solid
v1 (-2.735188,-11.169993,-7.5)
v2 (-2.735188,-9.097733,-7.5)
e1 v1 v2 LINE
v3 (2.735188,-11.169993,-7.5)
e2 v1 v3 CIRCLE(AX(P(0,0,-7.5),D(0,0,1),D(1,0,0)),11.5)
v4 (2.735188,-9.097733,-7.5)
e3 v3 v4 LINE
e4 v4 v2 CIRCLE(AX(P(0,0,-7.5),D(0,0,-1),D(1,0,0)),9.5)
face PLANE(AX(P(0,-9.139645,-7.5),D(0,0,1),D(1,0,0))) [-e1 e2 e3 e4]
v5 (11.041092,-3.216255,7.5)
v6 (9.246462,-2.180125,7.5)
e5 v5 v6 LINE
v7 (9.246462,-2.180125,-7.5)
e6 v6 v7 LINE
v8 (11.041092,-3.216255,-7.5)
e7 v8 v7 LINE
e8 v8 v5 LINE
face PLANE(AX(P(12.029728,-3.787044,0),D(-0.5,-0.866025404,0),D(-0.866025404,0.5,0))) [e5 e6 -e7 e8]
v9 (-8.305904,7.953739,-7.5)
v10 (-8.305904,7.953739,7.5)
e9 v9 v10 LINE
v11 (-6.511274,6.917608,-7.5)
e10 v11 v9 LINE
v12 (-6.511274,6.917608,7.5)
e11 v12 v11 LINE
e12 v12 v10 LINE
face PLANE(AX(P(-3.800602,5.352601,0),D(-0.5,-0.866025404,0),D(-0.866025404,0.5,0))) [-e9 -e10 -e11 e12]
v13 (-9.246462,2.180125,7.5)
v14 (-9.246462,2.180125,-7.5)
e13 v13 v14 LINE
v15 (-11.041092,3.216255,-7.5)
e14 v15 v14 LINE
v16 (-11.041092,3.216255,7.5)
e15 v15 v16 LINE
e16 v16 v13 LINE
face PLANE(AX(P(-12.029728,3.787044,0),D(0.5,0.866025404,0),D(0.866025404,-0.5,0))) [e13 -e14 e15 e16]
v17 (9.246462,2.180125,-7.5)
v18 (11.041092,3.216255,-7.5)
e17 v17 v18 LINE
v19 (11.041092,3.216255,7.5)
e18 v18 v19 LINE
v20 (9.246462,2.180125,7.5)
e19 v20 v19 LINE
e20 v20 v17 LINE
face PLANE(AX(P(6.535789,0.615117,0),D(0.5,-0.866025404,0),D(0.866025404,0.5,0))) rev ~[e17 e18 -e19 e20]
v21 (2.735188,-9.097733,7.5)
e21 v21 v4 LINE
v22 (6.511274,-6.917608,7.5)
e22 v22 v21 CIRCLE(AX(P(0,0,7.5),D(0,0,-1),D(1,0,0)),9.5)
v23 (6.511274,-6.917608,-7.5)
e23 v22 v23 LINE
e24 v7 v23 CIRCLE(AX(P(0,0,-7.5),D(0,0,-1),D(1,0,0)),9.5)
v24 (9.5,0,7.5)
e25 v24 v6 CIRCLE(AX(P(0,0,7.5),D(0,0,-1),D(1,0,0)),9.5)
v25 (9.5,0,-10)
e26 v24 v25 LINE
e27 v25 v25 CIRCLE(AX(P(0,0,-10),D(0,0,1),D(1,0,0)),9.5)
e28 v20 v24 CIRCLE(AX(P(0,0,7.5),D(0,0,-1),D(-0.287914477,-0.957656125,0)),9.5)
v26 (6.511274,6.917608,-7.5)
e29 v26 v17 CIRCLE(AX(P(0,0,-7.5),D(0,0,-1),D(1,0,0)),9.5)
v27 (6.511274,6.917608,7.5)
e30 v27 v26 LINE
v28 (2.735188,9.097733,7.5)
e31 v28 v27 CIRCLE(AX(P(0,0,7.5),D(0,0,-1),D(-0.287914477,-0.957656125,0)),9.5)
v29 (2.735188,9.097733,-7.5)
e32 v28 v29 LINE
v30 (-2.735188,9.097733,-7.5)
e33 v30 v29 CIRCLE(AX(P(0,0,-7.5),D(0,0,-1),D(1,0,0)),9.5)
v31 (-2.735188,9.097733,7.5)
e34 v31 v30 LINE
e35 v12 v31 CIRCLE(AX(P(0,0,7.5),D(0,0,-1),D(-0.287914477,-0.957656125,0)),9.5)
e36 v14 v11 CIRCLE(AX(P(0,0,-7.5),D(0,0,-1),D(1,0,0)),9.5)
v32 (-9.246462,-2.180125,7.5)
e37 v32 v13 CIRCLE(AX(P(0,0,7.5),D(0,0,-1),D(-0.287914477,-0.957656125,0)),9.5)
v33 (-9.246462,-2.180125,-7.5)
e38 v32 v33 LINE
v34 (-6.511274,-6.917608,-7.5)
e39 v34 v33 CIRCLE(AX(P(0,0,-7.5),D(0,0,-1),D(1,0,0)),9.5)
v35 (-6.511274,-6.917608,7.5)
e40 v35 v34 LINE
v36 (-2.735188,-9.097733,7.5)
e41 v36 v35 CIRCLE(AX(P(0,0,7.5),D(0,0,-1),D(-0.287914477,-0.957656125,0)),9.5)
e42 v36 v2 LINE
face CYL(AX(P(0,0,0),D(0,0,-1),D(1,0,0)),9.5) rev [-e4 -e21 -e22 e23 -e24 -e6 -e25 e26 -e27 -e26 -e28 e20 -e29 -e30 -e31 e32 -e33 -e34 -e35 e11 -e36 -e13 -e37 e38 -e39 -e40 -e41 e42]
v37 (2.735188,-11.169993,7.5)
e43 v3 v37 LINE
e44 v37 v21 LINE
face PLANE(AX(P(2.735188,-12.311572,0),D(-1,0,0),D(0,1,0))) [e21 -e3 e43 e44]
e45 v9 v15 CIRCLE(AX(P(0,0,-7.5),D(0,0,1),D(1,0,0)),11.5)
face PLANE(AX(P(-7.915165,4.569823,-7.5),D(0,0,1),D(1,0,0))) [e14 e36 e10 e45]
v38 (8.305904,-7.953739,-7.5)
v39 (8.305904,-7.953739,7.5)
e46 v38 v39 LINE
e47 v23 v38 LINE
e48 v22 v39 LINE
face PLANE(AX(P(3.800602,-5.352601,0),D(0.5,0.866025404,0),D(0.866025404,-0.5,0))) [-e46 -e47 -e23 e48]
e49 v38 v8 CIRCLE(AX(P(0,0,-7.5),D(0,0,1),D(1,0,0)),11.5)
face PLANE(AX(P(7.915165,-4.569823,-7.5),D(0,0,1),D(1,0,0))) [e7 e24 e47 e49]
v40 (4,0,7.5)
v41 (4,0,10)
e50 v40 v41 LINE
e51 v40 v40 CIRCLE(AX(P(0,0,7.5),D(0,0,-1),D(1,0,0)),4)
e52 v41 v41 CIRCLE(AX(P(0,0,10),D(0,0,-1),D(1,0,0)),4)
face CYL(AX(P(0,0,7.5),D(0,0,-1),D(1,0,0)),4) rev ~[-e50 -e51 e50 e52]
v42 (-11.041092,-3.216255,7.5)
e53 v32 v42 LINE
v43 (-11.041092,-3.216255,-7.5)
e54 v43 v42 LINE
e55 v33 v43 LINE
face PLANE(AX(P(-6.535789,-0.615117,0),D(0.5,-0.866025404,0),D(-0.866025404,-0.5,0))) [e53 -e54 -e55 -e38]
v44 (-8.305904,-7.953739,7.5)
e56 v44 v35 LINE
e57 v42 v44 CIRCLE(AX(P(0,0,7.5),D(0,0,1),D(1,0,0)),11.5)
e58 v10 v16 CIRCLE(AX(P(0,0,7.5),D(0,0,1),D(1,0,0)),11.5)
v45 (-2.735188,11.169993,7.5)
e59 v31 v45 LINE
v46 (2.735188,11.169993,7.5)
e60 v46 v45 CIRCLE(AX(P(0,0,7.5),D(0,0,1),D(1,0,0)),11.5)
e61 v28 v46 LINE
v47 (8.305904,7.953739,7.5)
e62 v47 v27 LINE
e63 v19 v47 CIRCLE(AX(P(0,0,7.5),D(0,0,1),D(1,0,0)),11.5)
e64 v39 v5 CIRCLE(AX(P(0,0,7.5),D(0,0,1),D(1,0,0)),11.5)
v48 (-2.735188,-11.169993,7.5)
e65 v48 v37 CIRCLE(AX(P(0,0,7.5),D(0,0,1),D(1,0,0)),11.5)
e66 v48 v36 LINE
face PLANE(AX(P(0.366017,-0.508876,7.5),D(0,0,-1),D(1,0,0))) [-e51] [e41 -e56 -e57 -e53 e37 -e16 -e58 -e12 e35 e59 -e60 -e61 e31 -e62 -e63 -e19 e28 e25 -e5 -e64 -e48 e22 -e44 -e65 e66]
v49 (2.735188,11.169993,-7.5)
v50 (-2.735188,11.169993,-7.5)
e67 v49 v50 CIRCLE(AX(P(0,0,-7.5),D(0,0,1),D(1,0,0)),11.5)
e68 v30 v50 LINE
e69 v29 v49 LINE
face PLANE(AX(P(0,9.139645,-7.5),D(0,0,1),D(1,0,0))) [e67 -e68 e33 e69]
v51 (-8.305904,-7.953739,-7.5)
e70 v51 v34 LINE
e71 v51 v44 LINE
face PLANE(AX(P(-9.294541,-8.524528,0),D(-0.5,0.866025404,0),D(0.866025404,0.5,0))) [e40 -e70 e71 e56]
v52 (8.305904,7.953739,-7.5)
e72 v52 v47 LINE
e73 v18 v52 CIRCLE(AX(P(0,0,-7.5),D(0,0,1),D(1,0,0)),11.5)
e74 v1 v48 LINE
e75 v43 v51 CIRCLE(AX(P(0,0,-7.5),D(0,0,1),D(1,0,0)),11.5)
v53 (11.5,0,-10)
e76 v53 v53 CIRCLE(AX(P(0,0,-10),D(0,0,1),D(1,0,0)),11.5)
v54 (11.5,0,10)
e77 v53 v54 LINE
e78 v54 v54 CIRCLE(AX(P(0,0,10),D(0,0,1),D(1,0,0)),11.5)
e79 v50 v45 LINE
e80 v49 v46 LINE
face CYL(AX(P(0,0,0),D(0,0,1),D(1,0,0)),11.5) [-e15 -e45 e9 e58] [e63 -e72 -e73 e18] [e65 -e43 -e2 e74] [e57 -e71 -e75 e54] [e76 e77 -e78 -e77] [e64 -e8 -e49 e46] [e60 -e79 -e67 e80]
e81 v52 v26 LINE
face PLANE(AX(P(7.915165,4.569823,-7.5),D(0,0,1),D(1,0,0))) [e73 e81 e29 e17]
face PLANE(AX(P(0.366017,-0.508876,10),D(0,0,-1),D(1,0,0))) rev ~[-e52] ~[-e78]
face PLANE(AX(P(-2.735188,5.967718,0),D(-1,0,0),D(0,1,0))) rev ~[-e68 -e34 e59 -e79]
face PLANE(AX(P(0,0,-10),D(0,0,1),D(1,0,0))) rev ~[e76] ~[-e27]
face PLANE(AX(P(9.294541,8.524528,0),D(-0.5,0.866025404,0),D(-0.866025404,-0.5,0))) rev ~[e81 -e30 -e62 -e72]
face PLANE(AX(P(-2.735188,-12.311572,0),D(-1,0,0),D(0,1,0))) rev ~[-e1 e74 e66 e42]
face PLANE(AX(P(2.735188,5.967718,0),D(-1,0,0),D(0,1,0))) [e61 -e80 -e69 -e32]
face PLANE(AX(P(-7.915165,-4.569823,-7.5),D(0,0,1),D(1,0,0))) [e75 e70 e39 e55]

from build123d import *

# Parameters (mm, degrees)
F0_R     = 11.5
F0_R_2   = 9.5
F1_DEPTH = 10
F2_W     = 5.4703750648
F2_H     = 6.3438538521
F3_DEPTH = 7.5
F4_R     = 4
F5_DEPTH = 2.5


with BuildPart() as f1:
    # F0 (on Top) → F1 (new body, symmetric)
    with BuildSketch(Plane.XY):
        Circle(F0_R)
        Circle(F0_R_2, mode=Mode.SUBTRACT)
    extrude(amount=F1_DEPTH, both=True)

    # F2 (on Top) → F3 (cut, symmetric)
    with BuildSketch(Plane.XY):
        with Locations((0, 9.139645283)):
            Rectangle(F2_W, F2_H)
        Polygon((-3.8006019335, 5.3526010656), (-9.2945405273, 8.5245279917), (-12.0297280597, 3.7870442173), (-6.5357894659, 0.6151172913), align=None)
        Polygon((-6.5357894659, -0.6151172913), (-12.0297280597, -3.7870442173), (-9.2945405273, -8.5245279917), (-3.8006019335, -5.3526010656), align=None)
        with Locations((0, -9.139645283)):
            Rectangle(F2_W, F2_H)
        Polygon((3.8006019335, -5.3526010656), (9.2945405273, -8.5245279917), (12.0297280597, -3.7870442173), (6.5357894659, -0.6151172913), align=None)
        Polygon((6.5357894659, 0.6151172913), (12.0297280597, 3.7870442173), (9.2945405273, 8.5245279917), (3.8006019335, 5.3526010656), align=None)
    extrude(amount=F3_DEPTH, both=True, mode=Mode.SUBTRACT)

    # F4 (on face) → F5 (join, through all)
    with BuildSketch(Plane(origin=(0, 0, 7.5), x_dir=(1, 0, 0), z_dir=(0, 0, -1))):
        with BuildLine():
            ThreePointArc((-2.7351875324, 9.0977331881), (-5.6685852928, -7.6234598955), (9.5, 0))
            ThreePointArc((9.5, 0), (7.6234598955, 5.6685852928), (2.7351875324, 9.0977331881))
            ThreePointArc((2.7351875324, 9.0977331881), (0, 9.5), (-2.7351875324, 9.0977331881))
        make_face()
        Circle(F4_R, mode=Mode.SUBTRACT)
    extrude(amount=-F5_DEPTH)


solid = f1.part
